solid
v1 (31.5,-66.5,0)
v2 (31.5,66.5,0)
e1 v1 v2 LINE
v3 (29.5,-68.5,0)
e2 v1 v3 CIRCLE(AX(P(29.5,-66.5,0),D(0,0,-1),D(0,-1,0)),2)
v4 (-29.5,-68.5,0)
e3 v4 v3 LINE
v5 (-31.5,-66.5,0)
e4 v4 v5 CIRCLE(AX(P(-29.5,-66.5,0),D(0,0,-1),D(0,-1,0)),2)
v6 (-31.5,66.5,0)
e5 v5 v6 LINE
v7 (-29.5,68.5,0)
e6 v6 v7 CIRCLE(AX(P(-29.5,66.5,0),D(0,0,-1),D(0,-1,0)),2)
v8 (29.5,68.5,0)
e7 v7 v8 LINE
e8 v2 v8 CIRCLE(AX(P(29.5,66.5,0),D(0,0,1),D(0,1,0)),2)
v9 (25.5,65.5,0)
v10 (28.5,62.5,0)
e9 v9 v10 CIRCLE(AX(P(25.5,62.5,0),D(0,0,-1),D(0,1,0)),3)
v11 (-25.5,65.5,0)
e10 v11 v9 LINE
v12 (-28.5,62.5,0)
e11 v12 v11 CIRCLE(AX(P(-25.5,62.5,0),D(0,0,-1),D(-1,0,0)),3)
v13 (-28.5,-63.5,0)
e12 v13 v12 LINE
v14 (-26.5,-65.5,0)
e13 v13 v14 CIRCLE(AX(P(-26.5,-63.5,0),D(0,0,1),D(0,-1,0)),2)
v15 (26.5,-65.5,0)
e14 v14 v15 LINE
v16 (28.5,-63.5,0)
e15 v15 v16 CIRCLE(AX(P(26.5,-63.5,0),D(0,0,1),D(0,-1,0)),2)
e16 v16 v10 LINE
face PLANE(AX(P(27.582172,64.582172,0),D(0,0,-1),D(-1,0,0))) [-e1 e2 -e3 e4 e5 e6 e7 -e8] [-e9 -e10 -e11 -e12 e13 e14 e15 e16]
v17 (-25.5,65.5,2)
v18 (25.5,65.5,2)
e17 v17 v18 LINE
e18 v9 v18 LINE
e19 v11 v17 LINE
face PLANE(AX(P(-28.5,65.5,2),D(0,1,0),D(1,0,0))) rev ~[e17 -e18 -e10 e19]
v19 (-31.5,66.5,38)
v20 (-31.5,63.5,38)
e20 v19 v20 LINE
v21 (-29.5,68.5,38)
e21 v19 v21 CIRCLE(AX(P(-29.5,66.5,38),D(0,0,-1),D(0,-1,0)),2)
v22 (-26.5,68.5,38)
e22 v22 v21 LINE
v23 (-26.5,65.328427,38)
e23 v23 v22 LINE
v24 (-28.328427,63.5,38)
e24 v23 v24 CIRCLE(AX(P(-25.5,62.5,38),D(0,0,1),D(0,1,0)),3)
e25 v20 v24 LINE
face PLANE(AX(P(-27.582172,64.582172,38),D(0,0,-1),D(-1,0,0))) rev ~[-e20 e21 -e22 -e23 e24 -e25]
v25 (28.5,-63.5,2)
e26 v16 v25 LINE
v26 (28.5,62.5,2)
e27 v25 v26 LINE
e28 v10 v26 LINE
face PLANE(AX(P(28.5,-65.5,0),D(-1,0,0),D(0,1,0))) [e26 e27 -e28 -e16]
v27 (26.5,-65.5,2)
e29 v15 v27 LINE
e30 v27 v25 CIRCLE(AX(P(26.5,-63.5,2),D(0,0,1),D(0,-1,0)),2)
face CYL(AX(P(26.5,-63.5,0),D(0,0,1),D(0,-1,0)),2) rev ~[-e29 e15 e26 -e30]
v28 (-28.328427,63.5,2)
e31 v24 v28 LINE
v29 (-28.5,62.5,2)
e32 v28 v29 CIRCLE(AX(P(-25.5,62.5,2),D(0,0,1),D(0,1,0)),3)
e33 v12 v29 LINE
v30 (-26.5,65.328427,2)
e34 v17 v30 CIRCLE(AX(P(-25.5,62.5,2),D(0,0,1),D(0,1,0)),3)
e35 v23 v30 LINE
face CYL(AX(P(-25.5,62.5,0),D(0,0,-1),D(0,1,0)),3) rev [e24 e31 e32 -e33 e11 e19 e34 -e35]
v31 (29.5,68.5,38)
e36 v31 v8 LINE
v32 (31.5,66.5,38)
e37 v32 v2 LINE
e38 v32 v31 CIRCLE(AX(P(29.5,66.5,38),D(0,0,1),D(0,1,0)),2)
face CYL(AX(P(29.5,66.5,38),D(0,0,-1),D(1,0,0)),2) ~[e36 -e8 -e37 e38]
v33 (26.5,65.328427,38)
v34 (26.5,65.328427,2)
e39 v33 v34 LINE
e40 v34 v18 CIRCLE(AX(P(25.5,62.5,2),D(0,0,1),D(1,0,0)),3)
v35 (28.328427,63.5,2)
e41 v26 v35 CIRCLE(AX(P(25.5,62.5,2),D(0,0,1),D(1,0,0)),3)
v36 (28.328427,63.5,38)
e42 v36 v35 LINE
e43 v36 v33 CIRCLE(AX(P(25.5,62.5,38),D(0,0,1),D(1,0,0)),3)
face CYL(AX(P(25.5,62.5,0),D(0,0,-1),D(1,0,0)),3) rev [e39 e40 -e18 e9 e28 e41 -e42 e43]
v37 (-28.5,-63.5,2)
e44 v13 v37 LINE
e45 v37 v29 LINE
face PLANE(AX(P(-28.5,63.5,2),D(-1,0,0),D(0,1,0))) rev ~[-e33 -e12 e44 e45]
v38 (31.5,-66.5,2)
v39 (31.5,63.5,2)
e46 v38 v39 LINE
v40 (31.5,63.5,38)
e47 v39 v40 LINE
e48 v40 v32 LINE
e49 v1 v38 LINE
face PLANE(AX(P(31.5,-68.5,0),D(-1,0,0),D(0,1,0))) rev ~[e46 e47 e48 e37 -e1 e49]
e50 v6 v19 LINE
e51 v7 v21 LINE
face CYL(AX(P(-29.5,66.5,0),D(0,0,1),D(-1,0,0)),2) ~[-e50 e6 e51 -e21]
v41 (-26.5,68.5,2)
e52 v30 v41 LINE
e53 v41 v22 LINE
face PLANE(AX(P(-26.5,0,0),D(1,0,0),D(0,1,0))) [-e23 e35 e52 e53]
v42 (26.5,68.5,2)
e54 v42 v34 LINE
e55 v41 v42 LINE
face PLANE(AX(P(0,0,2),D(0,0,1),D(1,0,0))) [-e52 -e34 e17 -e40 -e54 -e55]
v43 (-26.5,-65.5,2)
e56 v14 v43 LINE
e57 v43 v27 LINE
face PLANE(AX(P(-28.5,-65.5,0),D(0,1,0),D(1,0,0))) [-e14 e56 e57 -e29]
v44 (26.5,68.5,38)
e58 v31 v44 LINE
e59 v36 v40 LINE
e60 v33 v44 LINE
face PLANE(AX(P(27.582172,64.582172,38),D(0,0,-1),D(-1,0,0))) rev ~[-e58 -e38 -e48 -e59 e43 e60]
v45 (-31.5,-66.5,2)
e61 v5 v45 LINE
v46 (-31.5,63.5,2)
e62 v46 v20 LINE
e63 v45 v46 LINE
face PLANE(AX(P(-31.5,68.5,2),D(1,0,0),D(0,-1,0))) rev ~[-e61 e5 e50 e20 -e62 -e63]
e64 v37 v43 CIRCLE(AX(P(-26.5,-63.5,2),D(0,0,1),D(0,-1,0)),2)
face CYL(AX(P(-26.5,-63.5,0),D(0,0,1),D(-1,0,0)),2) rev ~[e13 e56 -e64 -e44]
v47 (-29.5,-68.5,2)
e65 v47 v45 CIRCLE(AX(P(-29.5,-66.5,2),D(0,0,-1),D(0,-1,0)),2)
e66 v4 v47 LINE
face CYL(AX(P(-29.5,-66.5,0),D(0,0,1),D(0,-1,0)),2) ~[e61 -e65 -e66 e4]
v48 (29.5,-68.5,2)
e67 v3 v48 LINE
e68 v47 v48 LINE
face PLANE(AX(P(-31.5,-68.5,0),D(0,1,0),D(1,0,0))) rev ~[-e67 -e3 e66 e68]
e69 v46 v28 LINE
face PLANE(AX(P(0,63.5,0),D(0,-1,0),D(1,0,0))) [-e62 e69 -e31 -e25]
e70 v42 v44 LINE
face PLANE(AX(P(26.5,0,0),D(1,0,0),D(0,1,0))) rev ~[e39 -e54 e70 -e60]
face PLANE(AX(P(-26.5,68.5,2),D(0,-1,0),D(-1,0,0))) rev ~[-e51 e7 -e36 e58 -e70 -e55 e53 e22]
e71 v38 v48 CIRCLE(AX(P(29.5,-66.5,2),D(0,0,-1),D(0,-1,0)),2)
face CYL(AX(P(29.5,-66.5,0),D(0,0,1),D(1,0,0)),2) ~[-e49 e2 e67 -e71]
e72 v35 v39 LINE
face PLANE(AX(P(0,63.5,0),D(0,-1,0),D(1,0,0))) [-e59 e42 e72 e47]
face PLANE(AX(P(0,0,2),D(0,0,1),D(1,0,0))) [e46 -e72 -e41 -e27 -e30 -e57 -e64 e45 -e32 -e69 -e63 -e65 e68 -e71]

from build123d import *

# Parameters (mm, degrees)
F0_W         = 63
F0_H         = 137
F0_W_2       = 57
F0_H_2       = 131
F1_DEPTH     = 2
F4_DEPTH     = 36
F5_T4_DEPTH  = 38
F5_T10_DEPTH = 38
F5_T17_DEPTH = 38
F5_T23_DEPTH = 38
F5_T30_DEPTH = 38
F5_T36_DEPTH = 38
F5_T43_DEPTH = 38
F5_T49_DEPTH = 38
F6_R         = 2


# Not quite as in the source:
# - a fillet or chamfer that OpenCascade refuses, or shapes differently, is made with other operations: its cross-section is extruded or revolved along the edge and cut away or added


with BuildPart() as f1:
    # F0 (on Top) → F1 (new body)
    with BuildSketch(Plane.XY):
        Rectangle(F0_W, F0_H)
        Rectangle(F0_W_2, F0_H_2, mode=Mode.SUBTRACT)
    extrude(amount=F1_DEPTH)

    # F3 (on face) → F4 (join, through all)
    with BuildSketch(Plane.XY.offset(2)):
        Polygon((-26.5, 68.5), (-31.5, 68.5), (-31.5, 63.5), (-28.5, 63.5), (-28.5, 65.5), (-26.5, 65.5), align=None)
        Polygon((31.5, 68.5), (26.5, 68.5), (26.5, 65.5), (28.5, 65.5), (28.5, 63.5), (31.5, 63.5), align=None)
    extrude(amount=F4_DEPTH)

    # F5: fillet of radius 3 on 2 edges, made by hand


with BuildPart() as f5_tool2:
    # F5_s3 → F5_t4 (new body)
    with BuildSketch(Plane.XY):
        with BuildLine():
            ThreePointArc((-25.5, 65.5), (-27.6213203436, 64.6213203436), (-28.5, 62.5))
            Line((-28.5, 62.5), (-28.5, 65.5))
            Line((-28.5, 65.5), (-25.5, 65.5))
        make_face()
    extrude(amount=F5_T4_DEPTH)

    split(bisect_by=Plane.XY.offset(2), keep=Keep.BOTTOM)

    split(bisect_by=Plane.YZ.offset(-26.5), keep=Keep.TOP)


with BuildPart() as f1_1:
    add(f1.part)

    # F5_t1: union F5_tool2
    add(f5_tool2.part)


with BuildPart() as f5_tool8:
    # F5_s9 → F5_t10 (new body)
    with BuildSketch(Plane.XY):
        with BuildLine():
            ThreePointArc((-25.5, 65.5), (-27.6213203436, 64.6213203436), (-28.5, 62.5))
            Line((-28.5, 62.5), (-28.5, 65.5))
            Line((-28.5, 65.5), (-25.5, 65.5))
        make_face()
    extrude(amount=F5_T10_DEPTH)

    split(bisect_by=Plane.XY.offset(2), keep=Keep.BOTTOM)

    split(bisect_by=Plane.XZ.offset(-63.5), keep=Keep.BOTTOM)

    split(bisect_by=Plane.YZ.offset(-26.5), keep=Keep.BOTTOM)


with BuildPart() as f1_2:
    add(f1_1.part)

    # F5_t7: union F5_tool8
    add(f5_tool8.part)


with BuildPart() as f5_tool15:
    # F5_s16 → F5_t17 (new body)
    with BuildSketch(Plane.XY):
        with BuildLine():
            ThreePointArc((-25.5, 65.5), (-27.6213203436, 64.6213203436), (-28.5, 62.5))
            Line((-28.5, 62.5), (-28.5, 65.5))
            Line((-28.5, 65.5), (-25.5, 65.5))
        make_face()
    extrude(amount=F5_T17_DEPTH)

    split(bisect_by=Plane.XY.offset(2), keep=Keep.BOTTOM)

    split(bisect_by=Plane.XZ.offset(-63.5), keep=Keep.TOP)


with BuildPart() as f1_3:
    add(f1_2.part)

    # F5_t14: union F5_tool15
    add(f5_tool15.part)


with BuildPart() as f5_tool21:
    # F5_s22 → F5_t23 (new body)
    with BuildSketch(Plane.XY):
        with BuildLine():
            ThreePointArc((-25.5, 65.5), (-27.6213203436, 64.6213203436), (-28.5, 62.5))
            Line((-28.5, 62.5), (-28.5, 65.5))
            Line((-28.5, 65.5), (-25.5, 65.5))
        make_face()
    extrude(amount=F5_T23_DEPTH)

    split(bisect_by=Plane.XY.offset(2), keep=Keep.TOP)

    split(bisect_by=Plane.XZ.offset(-63.5), keep=Keep.BOTTOM)

    split(bisect_by=Plane.YZ.offset(-26.5), keep=Keep.BOTTOM)


with BuildPart() as f1_4:
    add(f1_3.part)

    # F5_t20: union F5_tool21
    add(f5_tool21.part)


with BuildPart() as f5_tool28:
    # F5_s29 → F5_t30 (new body)
    with BuildSketch(Plane.XY):
        with BuildLine():
            ThreePointArc((28.5, 62.5), (27.6213203436, 64.6213203436), (25.5, 65.5))
            Line((25.5, 65.5), (28.5, 65.5))
            Line((28.5, 65.5), (28.5, 62.5))
        make_face()
    extrude(amount=F5_T30_DEPTH)

    split(bisect_by=Plane.XY.offset(2), keep=Keep.BOTTOM)

    split(bisect_by=Plane.XZ.offset(-63.5), keep=Keep.TOP)


with BuildPart() as f1_5:
    add(f1_4.part)

    # F5_t27: union F5_tool28
    add(f5_tool28.part)


with BuildPart() as f5_tool34:
    # F5_s35 → F5_t36 (new body)
    with BuildSketch(Plane.XY):
        with BuildLine():
            ThreePointArc((28.5, 62.5), (27.6213203436, 64.6213203436), (25.5, 65.5))
            Line((25.5, 65.5), (28.5, 65.5))
            Line((28.5, 65.5), (28.5, 62.5))
        make_face()
    extrude(amount=F5_T36_DEPTH)

    split(bisect_by=Plane.XY.offset(2), keep=Keep.BOTTOM)

    split(bisect_by=Plane.XZ.offset(-63.5), keep=Keep.BOTTOM)

    split(bisect_by=Plane.YZ.offset(26.5), keep=Keep.TOP)


with BuildPart() as f1_6:
    add(f1_5.part)

    # F5_t33: union F5_tool34
    add(f5_tool34.part)


with BuildPart() as f5_tool41:
    # F5_s42 → F5_t43 (new body)
    with BuildSketch(Plane.XY):
        with BuildLine():
            ThreePointArc((28.5, 62.5), (27.6213203436, 64.6213203436), (25.5, 65.5))
            Line((25.5, 65.5), (28.5, 65.5))
            Line((28.5, 65.5), (28.5, 62.5))
        make_face()
    extrude(amount=F5_T43_DEPTH)

    split(bisect_by=Plane.XY.offset(2), keep=Keep.BOTTOM)

    split(bisect_by=Plane.YZ.offset(26.5), keep=Keep.BOTTOM)


with BuildPart() as f1_7:
    add(f1_6.part)

    # F5_t40: union F5_tool41
    add(f5_tool41.part)


with BuildPart() as f5_tool47:
    # F5_s48 → F5_t49 (new body)
    with BuildSketch(Plane.XY):
        with BuildLine():
            ThreePointArc((28.5, 62.5), (27.6213203436, 64.6213203436), (25.5, 65.5))
            Line((25.5, 65.5), (28.5, 65.5))
            Line((28.5, 65.5), (28.5, 62.5))
        make_face()
    extrude(amount=F5_T49_DEPTH)

    split(bisect_by=Plane.XY.offset(2), keep=Keep.TOP)

    split(bisect_by=Plane.XZ.offset(-63.5), keep=Keep.BOTTOM)

    split(bisect_by=Plane.YZ.offset(26.5), keep=Keep.TOP)


with BuildPart() as f1_8:
    add(f1_7.part)

    # F5_t46: union F5_tool47
    add(f5_tool47.part)

    # F6
    f6_edges = [f1_8.edges().sort_by_distance(p)[0] for p in [
        (-31.5, 68.5, 19),
        (31.5, 68.5, 19),
        (31.5, -68.5, 1),
        (-31.5, -68.5, 1),
        (28.5, -65.5, 1),
        (-28.5, -65.5, 1),
    ]]
    fillet(f6_edges, radius=F6_R)


solid = f1_8.part
